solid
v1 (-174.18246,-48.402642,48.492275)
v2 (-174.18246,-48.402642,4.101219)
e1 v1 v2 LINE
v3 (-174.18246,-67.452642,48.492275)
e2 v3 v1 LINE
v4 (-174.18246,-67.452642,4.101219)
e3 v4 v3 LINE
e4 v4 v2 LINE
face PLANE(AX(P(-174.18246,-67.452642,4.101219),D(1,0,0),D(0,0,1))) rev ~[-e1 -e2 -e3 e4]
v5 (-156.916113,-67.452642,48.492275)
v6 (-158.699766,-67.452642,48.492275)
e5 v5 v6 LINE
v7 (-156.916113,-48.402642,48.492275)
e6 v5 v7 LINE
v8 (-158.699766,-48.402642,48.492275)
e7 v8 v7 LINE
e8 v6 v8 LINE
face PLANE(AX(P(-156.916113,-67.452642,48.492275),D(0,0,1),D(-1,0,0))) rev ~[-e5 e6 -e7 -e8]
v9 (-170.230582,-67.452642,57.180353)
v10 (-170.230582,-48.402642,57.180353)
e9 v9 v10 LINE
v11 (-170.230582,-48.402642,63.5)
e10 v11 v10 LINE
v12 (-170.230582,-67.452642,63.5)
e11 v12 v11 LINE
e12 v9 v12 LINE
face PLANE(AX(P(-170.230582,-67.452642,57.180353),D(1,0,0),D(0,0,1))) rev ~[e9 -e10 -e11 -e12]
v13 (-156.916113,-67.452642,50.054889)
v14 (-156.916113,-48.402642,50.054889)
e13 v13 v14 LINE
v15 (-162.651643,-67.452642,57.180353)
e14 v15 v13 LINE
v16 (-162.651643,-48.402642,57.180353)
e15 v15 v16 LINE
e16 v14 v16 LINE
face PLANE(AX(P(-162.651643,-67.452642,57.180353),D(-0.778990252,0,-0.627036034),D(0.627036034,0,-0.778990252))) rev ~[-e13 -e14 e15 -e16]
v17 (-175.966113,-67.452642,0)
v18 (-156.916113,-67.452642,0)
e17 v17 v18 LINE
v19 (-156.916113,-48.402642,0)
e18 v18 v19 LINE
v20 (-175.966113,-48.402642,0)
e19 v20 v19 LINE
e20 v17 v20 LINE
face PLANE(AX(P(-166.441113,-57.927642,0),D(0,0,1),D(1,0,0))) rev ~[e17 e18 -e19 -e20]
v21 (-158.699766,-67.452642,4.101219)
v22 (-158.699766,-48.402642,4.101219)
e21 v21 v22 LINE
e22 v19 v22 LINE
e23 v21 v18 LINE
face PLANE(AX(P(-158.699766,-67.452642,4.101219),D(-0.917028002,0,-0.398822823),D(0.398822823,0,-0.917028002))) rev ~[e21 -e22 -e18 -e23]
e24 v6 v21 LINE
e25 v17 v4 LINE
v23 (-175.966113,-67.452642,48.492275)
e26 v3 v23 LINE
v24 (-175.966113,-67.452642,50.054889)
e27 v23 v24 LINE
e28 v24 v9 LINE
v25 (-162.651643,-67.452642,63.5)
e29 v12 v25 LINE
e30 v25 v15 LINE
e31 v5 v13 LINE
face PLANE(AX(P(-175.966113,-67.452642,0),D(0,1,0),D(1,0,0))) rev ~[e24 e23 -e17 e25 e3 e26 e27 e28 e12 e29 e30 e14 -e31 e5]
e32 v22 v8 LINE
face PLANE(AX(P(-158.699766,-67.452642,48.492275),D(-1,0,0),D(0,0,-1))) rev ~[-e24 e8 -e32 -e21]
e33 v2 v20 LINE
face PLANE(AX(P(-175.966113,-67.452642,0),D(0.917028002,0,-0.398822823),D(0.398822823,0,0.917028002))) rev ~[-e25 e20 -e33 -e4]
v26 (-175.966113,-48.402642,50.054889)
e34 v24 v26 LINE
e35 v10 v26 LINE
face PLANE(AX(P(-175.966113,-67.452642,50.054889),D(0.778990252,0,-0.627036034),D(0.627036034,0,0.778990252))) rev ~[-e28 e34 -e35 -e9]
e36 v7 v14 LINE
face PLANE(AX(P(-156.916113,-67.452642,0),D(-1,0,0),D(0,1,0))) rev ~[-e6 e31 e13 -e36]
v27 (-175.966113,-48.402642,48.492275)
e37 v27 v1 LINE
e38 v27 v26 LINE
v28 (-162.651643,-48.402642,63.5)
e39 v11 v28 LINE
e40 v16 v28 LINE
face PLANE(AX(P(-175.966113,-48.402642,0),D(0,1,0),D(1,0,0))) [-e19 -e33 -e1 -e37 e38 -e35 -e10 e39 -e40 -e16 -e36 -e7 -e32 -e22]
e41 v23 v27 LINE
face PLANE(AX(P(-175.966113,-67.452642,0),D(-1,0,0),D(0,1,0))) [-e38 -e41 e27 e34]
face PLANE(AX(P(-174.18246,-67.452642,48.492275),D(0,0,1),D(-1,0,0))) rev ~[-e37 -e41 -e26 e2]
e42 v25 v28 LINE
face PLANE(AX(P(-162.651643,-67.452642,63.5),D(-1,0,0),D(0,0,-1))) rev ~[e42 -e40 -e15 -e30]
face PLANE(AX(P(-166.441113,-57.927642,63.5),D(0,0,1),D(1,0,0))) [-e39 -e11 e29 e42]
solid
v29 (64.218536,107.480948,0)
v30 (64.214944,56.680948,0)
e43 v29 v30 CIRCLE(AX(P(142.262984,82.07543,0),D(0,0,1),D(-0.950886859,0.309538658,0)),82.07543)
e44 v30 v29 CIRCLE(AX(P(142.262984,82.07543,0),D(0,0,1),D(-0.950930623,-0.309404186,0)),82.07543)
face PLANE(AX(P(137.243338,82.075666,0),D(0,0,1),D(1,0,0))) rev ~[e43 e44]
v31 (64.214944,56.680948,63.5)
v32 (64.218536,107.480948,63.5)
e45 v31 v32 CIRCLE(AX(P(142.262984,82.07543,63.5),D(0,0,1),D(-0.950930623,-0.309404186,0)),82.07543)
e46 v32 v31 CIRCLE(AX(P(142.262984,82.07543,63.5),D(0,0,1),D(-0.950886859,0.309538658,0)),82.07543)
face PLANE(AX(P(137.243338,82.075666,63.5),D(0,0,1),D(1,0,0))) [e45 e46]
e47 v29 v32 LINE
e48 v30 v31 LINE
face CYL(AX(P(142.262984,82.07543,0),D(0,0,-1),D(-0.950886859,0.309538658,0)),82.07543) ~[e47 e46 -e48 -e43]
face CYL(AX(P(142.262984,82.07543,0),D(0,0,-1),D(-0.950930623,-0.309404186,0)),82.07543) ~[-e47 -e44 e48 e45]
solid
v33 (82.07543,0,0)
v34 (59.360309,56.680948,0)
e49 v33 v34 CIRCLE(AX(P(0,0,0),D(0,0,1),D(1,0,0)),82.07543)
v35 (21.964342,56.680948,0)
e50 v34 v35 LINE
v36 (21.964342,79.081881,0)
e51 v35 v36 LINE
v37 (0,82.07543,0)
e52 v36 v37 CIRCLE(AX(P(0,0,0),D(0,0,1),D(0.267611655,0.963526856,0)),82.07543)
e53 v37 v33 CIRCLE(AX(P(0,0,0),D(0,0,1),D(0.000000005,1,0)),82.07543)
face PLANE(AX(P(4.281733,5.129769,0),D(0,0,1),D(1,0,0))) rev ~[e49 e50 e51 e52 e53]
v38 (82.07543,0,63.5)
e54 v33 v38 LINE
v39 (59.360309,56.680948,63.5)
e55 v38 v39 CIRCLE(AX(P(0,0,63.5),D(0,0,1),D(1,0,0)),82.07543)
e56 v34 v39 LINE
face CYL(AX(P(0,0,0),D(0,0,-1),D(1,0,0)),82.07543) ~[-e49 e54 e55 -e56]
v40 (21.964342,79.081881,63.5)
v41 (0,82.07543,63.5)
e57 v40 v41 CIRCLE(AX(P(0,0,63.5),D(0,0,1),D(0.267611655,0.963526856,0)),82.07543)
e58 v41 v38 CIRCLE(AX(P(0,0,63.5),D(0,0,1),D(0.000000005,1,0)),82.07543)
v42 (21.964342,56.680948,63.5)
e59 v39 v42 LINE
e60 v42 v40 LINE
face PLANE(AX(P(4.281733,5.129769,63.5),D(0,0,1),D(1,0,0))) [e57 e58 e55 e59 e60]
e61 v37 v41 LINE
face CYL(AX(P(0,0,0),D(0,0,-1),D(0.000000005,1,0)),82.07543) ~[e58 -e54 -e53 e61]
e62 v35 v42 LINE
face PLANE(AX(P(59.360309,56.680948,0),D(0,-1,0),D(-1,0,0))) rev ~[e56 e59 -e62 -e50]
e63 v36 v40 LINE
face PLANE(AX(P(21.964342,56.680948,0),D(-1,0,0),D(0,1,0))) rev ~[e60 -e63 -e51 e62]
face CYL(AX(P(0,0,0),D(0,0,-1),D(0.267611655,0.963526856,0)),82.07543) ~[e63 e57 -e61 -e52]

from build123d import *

# Parameters (mm, degrees)
F1_DEPTH = 63.5
F2_W     = 19.05
F2_H     = 19.05
F3_DEPTH = 63.5
F5_DEPTH = 25.4
F6_DEPTH = 25.4


with BuildPart() as f1:
    # F0 (on Top) → F1 (new body)
    with BuildSketch(Plane.XY):
        with BuildLine():
            ThreePointArc((3.706e-07, 82.0754298145), (-58.0360931216, -58.0360928596), (82.0754298145, 0))
            ThreePointArc((82.0754298145, 0), (76.1852973221, 30.5315681088), (59.3603090217, 56.6809482285))
            Line((59.3603090217, 56.6809482285), (21.9643415828, 56.6809482285))
            Line((21.9643415828, 56.6809482285), (21.9643415828, 79.0818808455))
            ThreePointArc((21.9643415828, 79.0818808455), (11.0837003396, 81.3235990719), (3.706e-07, 82.0754298145))
        make_face()
    extrude(amount=F1_DEPTH)


with BuildPart() as f1b:
    # F0 (on Top) → F1, piece 2 (new body)
    with BuildSketch(Plane.XY):
        with BuildLine():
            Line((72.7643415828, 56.6809482285), (64.2149444137, 56.6809482285))
            ThreePointArc((64.2149444137, 56.6809482285), (155.1189122788, 1.0131001695), (224.3384138205, 82.0754298145))
            ThreePointArc((224.3384138205, 82.0754298145), (155.124643919, 163.136850253), (64.2185363282, 107.4809482285))
            Line((64.2185363282, 107.4809482285), (72.7643415828, 107.4809482285))
            Line((72.7643415828, 107.4809482285), (72.7643415828, 56.6809482285))
        make_face()
        with BuildLine():
            ThreePointArc((64.2185363282, 107.4809482285), (60.1875543967, 82.0812331201), (64.2149444137, 56.6809482285))
            Line((64.2149444137, 56.6809482285), (72.7643415828, 56.6809482285))
            Line((72.7643415828, 56.6809482285), (72.7643415828, 107.4809482285))
            Line((72.7643415828, 107.4809482285), (64.2185363282, 107.4809482285))
        make_face()
    extrude(amount=F1_DEPTH)


with BuildPart() as f3:
    # F2 (on Top) → F3 (new body)
    with BuildSketch(Plane.XY):
        with Locations((-166.4411127567, -57.9276421648)):
            Rectangle(F2_W, F2_H)
    extrude(amount=F3_DEPTH)

    # F4 (on face) → F5 (cut)
    with BuildSketch(Plane.XZ.offset(67.4526421648)):
        Polygon((-162.651643157, 57.180352509), (-156.9161127567, 50.0548891723), (-156.9161127567, 63.5), (-162.651643157, 63.5), align=None)
        Polygon((-158.6997658014, 4.1012191214), (-156.9161127567, 0), (-156.9161127567, 48.4922751784), (-158.6997658014, 48.4922751784), align=None)
    extrude(amount=-F5_DEPTH, mode=Mode.SUBTRACT)

    # F4 (on face) → F6 (cut)
    with BuildSketch(Plane.XZ.offset(67.4526421648)):
        Polygon((-170.2305823565, 57.180352509), (-170.2305823565, 63.5), (-175.9661127567, 63.5), (-175.9661127567, 50.0548891723), align=None)
        Polygon((-175.9661127567, 48.4922751784), (-175.9661127567, 0), (-174.182459712, 4.1012191214), (-174.182459712, 48.4922751784), align=None)
    extrude(amount=-F6_DEPTH, mode=Mode.SUBTRACT)


solid = Compound([f1.part, f1b.part, f3.part])
